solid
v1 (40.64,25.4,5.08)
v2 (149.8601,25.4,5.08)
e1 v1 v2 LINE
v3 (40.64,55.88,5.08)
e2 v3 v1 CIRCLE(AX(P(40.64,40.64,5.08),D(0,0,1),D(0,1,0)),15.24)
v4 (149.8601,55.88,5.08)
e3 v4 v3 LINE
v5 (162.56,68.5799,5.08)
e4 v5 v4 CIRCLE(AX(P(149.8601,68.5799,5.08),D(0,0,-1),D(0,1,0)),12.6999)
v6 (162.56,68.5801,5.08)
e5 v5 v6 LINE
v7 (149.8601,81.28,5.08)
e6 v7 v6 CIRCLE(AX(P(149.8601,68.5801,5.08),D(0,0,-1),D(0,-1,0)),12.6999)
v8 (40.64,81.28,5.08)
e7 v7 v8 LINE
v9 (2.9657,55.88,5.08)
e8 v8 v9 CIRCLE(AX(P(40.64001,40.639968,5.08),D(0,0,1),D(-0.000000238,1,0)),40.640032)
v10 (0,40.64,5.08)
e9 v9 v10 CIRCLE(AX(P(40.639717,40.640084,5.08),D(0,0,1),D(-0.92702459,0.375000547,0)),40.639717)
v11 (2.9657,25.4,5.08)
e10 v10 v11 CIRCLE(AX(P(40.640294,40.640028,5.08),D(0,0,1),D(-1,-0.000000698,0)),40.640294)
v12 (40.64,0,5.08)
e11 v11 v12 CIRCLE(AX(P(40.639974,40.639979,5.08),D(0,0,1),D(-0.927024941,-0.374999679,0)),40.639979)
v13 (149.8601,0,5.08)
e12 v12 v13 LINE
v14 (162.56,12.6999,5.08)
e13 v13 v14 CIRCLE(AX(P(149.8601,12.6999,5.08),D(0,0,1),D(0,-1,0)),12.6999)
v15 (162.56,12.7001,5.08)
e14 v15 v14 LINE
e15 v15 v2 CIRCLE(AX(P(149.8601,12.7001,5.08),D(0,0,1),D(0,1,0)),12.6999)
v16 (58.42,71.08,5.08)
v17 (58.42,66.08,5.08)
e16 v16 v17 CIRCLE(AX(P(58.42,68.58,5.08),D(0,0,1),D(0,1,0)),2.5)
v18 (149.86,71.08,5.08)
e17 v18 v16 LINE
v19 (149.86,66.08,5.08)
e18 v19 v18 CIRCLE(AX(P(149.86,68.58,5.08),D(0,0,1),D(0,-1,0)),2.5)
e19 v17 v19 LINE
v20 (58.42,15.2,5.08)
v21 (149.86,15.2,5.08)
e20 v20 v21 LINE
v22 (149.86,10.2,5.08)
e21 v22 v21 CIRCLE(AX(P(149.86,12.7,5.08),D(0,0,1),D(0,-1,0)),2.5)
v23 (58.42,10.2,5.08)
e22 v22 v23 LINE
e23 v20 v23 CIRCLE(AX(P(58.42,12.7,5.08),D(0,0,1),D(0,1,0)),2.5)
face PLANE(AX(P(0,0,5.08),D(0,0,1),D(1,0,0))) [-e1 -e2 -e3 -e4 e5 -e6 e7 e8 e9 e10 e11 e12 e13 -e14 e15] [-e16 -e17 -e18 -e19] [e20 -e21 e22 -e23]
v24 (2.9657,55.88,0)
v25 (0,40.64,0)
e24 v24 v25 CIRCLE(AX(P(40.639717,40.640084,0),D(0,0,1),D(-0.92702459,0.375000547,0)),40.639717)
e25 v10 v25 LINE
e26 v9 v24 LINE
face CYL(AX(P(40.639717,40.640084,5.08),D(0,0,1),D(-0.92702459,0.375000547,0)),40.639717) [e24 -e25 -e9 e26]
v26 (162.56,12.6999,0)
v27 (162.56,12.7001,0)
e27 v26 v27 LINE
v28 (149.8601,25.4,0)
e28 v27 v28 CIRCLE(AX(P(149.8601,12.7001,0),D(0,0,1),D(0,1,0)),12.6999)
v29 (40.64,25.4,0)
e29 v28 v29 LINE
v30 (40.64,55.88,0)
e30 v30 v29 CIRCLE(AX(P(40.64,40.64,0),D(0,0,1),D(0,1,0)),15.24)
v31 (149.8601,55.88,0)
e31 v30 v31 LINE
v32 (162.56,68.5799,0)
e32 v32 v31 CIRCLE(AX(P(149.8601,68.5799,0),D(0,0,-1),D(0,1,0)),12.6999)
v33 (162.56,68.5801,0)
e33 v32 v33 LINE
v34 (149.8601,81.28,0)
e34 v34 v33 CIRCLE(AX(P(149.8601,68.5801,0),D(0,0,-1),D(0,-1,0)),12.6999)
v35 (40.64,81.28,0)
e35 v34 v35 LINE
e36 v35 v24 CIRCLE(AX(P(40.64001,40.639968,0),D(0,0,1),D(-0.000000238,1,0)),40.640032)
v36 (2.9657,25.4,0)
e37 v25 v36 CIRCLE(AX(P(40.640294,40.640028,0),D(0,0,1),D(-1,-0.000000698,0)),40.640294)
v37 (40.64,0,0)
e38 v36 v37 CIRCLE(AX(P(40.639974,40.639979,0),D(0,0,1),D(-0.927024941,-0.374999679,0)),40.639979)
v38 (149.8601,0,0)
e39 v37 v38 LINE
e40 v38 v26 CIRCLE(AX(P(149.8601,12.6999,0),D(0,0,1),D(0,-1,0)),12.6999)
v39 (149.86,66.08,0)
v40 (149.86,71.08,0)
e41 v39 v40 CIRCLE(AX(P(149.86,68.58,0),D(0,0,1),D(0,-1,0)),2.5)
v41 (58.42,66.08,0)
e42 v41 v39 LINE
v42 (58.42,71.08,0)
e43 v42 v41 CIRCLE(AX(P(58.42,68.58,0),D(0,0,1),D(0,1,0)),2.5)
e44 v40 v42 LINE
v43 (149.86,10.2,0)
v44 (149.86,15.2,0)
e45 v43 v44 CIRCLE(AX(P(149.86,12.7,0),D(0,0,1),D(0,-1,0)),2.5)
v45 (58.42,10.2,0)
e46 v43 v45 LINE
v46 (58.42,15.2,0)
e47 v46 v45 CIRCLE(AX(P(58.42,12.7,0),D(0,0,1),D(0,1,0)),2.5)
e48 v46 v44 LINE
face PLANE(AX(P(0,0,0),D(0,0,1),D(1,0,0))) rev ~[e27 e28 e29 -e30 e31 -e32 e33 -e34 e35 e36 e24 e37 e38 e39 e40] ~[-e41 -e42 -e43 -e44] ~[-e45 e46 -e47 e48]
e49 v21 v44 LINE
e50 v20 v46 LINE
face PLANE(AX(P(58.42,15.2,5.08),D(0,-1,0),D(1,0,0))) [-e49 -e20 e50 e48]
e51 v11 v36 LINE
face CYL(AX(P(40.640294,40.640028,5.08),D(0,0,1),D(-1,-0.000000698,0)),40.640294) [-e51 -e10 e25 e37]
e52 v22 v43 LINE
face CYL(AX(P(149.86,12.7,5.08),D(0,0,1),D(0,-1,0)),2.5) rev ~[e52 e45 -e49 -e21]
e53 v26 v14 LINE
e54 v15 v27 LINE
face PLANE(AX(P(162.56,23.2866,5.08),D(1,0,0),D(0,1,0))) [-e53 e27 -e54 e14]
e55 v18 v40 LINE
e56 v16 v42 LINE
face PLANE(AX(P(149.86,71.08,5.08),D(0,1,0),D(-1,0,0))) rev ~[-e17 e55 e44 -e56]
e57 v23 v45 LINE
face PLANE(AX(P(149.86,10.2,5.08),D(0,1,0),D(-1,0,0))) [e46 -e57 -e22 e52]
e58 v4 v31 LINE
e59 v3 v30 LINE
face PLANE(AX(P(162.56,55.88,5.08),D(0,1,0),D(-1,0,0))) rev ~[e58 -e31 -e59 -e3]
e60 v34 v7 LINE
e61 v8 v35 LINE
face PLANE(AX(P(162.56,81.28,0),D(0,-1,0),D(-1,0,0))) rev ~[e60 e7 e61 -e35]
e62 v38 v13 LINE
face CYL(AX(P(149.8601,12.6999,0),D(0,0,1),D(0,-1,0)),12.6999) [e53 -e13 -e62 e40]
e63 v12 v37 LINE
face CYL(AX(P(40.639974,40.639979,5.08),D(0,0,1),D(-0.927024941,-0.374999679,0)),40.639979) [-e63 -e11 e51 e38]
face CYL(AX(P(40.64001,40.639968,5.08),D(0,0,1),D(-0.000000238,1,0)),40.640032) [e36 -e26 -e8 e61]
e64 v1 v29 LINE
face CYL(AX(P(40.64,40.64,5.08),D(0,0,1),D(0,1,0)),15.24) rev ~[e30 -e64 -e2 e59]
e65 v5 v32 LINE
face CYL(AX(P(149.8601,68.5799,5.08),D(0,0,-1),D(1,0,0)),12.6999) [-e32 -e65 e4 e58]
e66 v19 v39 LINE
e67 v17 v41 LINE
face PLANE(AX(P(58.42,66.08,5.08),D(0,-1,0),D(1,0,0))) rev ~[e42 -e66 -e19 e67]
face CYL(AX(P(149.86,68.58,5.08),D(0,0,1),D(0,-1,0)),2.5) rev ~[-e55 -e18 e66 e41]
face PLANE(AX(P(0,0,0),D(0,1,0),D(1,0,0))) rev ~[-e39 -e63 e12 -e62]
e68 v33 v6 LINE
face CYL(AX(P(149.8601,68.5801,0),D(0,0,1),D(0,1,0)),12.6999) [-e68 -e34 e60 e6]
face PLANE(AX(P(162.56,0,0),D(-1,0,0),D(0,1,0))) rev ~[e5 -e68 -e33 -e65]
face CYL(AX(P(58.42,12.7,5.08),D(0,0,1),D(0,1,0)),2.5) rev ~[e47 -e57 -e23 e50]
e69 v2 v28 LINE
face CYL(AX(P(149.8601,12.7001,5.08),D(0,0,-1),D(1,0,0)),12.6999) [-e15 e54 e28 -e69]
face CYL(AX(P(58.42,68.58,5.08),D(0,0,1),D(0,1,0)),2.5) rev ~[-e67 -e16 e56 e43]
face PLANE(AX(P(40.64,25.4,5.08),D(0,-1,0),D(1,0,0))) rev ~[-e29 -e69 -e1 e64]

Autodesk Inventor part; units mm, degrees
ref_plane "YZ Plane" through (0, 0, 0) normal (1, 0, 0) x (0, 1, 0)
ref_plane "XZ Plane" through (0, 0, 0) normal (0, 1, 0) x (-1, 0, 0)
ref_plane "XY Plane" through (0, 0, 0) normal (0, 0, 1) x (1, 0, 0)
sketch "Sketch1" plane through (0, 0, 0) normal (0, 0, 1) x (1, 0, 0)
  line L0 (0, 0) -> (162.56, 0)
  line L1 (162.56, 0) -> (162.56, 81.28)
  line L2 (162.56, 81.28) -> (0, 81.28)
  line L3 (0, 81.28) -> (0, 0)
  dimension "d0" = 162.56
  dimension "d1" = 81.28
extrude "Extrusion1" add sketch "Sketch1" along normal blind 5.08
sketch "Sketch2" plane through (0, 0, 5.08) normal (0, 0, 1) x (1, 0, 0)
  line L0 (0, 0) -> (162.56, 0) projected
  line L1 (162.56, 0) -> (162.56, 81.28) projected
  line L2 (162.56, 81.28) -> (0, 81.28) projected
  line L3 (0, 81.28) -> (0, 0) construction
  line L4 (0, 40.64) -> (162.56, 40.64) construction
  arc A0 (40.64, 55.88) -> (40.64, 25.4) centre (40.64, 40.64) ccw
  arc A1 (78.3143, 55.88) -> (40.64, 81.28) centre (40.64, 40.64) ccw construction
  line L5 (0, 81.28) -> (0, 0) projected
  line L6 (0, 0) -> (162.56, 0) projected
  line L7 (0, 81.28) -> (40.64, 81.28) construction
  line L8 (162.56, 81.28) -> (162.56, 0)
  line L9 (162.56, 0) -> (40.64, 0)
  line L10 (0, 0) -> (0, 40.64)
  line L11 (0, 40.64) -> (0, 81.28)
  line L12 (40.64, 0) -> (0, 0) construction
  line L13 (40.64, 81.28) -> (162.56, 81.28)
  line L14 (40.64, 25.4) -> (78.3143, 25.4)
  line L15 (40.64, 55.88) -> (78.3143, 55.88)
  line L16 (162.56, 0) -> (162.56, 81.28) projected
  line L17 (162.56, 23.2866) -> (162.56, 55.88)
  line L18 (40.64, 25.4) -> (78.3143, 25.4)
  line L19 (162.56, 25.4) -> (162.56, 55.88) construction
  line L20 (162.56, 55.88) -> (40.64, 55.88)
  line L21 (40.64, 55.88) -> (40.64, 25.4) construction
  arc A2 (55.88, 40.64) -> (40.64, 55.88) centre (40.64, 40.64) ccw construction
  arc A3 (40.64, 25.4) -> (55.88, 40.64) centre (40.64, 40.64) ccw construction
  arc A4 (81.28, 40.64) -> (78.3143, 55.88) centre (40.64, 40.64) ccw construction
  arc A5 (78.3143, 25.4) -> (81.28, 40.64) centre (40.64, 40.64) ccw construction
  arc A6 (40.64, 81.28) -> (2.9657, 55.88) centre (40.64, 40.64) ccw
  arc A7 (40.64, 0) -> (78.3143, 25.4) centre (40.64, 40.64) ccw construction
  arc A8 (0, 40.64) -> (2.9657, 25.4) centre (40.64, 40.64) ccw
  arc A9 (2.9657, 25.4) -> (40.64, 0) centre (40.64, 40.64) ccw
  arc A10 (2.9657, 55.88) -> (0, 40.64) centre (40.64, 40.64) ccw
  line L22 (78.3143, 55.88) -> (162.56, 55.88)
  line L23 (78.3143, 25.4) -> (162.56, 25.4)
  line L24 (78.3143, 25.4) -> (162.56, 25.4)
  dimension "d4" = 30.48
extrude "Extrusion2" cut sketch "Sketch2" against normal blind 5.08 contours A9 A8 A10 A6 L2 L1 L20 L15 A0 L14 L23 L0 keep common part
sketch "Sketch3" plane through (0, 0, 5.08) normal (0, 0, 1) x (1, 0, 0)
  line L0 (162.56, 55.88) -> (40.64, 55.88) projected
  line L1 (162.56, 55.88) -> (162.56, 81.28) projected
  line L2 (162.56, 81.28) -> (40.64, 81.28) projected
  arc A0 (40.64, 81.28) -> (40.64, 0) centre (40.64, 40.64) ccw projected
  line L3 (40.64, 0) -> (162.56, 0) projected
  line L4 (162.56, 0) -> (162.56, 25.4) projected
  line L5 (40.64, 25.4) -> (162.56, 25.4) projected
  arc A1 (40.64, 55.88) -> (40.64, 25.4) centre (40.64, 40.64) ccw projected
  line L6 (40.64, 40.64) -> (162.56, 40.64) construction
  line L7 (162.56, 40.64) -> (162.56, 25.4) construction
  line L8 (58.42, 68.58) -> (149.86, 68.58) construction
  line L9 (58.42, 66.08) -> (149.86, 66.08)
  line L10 (149.86, 71.08) -> (58.42, 71.08)
  arc A2 (58.42, 71.08) -> (58.42, 66.08) centre (58.42, 68.58) ccw
  arc A3 (149.86, 66.08) -> (149.86, 71.08) centre (149.86, 68.58) ccw
  line L11 (40.64, 55.88) -> (40.64, 81.28) construction
  line L12 (58.42, 12.7) -> (149.86, 12.7) construction
  line L13 (58.42, 15.2) -> (149.86, 15.2)
  line L14 (149.86, 10.2) -> (58.42, 10.2)
  arc A4 (58.42, 15.2) -> (58.42, 10.2) centre (58.42, 12.7) ccw
  arc A5 (149.86, 10.2) -> (149.86, 15.2) centre (149.86, 12.7) ccw
  point P0 (0, 0)
  point P1 (104.14, 68.58)
  point P2 (104.14, 12.7)
  dimension "d7" = 2.5
  dimension "d8" = 121.92
  dimension "d10" = 25.4
  dimension "d11" = 12.7
  dimension "d12" = 91.44
  dimension "d13" = 12.7
extrude "Extrusion3" cut sketch "Sketch3" against normal blind 5.08 contours A2 L10 A3 L9 | L13 A5 L14 A4
fillet "Fillet1" radius 12.7 4 edges at (162.56, 0, 2.54) (162.56, 25.4, 2.54) (162.56, 55.88, 2.54) (162.56, 81.28, 2.54)
equation "\"d0\" = 2 * d1"
equation "\"d11\" = 0.5 * d10"
equation "\"d13\" = d11"
properties part number "SuctionGrabberA" material "Wood (Birch)"
